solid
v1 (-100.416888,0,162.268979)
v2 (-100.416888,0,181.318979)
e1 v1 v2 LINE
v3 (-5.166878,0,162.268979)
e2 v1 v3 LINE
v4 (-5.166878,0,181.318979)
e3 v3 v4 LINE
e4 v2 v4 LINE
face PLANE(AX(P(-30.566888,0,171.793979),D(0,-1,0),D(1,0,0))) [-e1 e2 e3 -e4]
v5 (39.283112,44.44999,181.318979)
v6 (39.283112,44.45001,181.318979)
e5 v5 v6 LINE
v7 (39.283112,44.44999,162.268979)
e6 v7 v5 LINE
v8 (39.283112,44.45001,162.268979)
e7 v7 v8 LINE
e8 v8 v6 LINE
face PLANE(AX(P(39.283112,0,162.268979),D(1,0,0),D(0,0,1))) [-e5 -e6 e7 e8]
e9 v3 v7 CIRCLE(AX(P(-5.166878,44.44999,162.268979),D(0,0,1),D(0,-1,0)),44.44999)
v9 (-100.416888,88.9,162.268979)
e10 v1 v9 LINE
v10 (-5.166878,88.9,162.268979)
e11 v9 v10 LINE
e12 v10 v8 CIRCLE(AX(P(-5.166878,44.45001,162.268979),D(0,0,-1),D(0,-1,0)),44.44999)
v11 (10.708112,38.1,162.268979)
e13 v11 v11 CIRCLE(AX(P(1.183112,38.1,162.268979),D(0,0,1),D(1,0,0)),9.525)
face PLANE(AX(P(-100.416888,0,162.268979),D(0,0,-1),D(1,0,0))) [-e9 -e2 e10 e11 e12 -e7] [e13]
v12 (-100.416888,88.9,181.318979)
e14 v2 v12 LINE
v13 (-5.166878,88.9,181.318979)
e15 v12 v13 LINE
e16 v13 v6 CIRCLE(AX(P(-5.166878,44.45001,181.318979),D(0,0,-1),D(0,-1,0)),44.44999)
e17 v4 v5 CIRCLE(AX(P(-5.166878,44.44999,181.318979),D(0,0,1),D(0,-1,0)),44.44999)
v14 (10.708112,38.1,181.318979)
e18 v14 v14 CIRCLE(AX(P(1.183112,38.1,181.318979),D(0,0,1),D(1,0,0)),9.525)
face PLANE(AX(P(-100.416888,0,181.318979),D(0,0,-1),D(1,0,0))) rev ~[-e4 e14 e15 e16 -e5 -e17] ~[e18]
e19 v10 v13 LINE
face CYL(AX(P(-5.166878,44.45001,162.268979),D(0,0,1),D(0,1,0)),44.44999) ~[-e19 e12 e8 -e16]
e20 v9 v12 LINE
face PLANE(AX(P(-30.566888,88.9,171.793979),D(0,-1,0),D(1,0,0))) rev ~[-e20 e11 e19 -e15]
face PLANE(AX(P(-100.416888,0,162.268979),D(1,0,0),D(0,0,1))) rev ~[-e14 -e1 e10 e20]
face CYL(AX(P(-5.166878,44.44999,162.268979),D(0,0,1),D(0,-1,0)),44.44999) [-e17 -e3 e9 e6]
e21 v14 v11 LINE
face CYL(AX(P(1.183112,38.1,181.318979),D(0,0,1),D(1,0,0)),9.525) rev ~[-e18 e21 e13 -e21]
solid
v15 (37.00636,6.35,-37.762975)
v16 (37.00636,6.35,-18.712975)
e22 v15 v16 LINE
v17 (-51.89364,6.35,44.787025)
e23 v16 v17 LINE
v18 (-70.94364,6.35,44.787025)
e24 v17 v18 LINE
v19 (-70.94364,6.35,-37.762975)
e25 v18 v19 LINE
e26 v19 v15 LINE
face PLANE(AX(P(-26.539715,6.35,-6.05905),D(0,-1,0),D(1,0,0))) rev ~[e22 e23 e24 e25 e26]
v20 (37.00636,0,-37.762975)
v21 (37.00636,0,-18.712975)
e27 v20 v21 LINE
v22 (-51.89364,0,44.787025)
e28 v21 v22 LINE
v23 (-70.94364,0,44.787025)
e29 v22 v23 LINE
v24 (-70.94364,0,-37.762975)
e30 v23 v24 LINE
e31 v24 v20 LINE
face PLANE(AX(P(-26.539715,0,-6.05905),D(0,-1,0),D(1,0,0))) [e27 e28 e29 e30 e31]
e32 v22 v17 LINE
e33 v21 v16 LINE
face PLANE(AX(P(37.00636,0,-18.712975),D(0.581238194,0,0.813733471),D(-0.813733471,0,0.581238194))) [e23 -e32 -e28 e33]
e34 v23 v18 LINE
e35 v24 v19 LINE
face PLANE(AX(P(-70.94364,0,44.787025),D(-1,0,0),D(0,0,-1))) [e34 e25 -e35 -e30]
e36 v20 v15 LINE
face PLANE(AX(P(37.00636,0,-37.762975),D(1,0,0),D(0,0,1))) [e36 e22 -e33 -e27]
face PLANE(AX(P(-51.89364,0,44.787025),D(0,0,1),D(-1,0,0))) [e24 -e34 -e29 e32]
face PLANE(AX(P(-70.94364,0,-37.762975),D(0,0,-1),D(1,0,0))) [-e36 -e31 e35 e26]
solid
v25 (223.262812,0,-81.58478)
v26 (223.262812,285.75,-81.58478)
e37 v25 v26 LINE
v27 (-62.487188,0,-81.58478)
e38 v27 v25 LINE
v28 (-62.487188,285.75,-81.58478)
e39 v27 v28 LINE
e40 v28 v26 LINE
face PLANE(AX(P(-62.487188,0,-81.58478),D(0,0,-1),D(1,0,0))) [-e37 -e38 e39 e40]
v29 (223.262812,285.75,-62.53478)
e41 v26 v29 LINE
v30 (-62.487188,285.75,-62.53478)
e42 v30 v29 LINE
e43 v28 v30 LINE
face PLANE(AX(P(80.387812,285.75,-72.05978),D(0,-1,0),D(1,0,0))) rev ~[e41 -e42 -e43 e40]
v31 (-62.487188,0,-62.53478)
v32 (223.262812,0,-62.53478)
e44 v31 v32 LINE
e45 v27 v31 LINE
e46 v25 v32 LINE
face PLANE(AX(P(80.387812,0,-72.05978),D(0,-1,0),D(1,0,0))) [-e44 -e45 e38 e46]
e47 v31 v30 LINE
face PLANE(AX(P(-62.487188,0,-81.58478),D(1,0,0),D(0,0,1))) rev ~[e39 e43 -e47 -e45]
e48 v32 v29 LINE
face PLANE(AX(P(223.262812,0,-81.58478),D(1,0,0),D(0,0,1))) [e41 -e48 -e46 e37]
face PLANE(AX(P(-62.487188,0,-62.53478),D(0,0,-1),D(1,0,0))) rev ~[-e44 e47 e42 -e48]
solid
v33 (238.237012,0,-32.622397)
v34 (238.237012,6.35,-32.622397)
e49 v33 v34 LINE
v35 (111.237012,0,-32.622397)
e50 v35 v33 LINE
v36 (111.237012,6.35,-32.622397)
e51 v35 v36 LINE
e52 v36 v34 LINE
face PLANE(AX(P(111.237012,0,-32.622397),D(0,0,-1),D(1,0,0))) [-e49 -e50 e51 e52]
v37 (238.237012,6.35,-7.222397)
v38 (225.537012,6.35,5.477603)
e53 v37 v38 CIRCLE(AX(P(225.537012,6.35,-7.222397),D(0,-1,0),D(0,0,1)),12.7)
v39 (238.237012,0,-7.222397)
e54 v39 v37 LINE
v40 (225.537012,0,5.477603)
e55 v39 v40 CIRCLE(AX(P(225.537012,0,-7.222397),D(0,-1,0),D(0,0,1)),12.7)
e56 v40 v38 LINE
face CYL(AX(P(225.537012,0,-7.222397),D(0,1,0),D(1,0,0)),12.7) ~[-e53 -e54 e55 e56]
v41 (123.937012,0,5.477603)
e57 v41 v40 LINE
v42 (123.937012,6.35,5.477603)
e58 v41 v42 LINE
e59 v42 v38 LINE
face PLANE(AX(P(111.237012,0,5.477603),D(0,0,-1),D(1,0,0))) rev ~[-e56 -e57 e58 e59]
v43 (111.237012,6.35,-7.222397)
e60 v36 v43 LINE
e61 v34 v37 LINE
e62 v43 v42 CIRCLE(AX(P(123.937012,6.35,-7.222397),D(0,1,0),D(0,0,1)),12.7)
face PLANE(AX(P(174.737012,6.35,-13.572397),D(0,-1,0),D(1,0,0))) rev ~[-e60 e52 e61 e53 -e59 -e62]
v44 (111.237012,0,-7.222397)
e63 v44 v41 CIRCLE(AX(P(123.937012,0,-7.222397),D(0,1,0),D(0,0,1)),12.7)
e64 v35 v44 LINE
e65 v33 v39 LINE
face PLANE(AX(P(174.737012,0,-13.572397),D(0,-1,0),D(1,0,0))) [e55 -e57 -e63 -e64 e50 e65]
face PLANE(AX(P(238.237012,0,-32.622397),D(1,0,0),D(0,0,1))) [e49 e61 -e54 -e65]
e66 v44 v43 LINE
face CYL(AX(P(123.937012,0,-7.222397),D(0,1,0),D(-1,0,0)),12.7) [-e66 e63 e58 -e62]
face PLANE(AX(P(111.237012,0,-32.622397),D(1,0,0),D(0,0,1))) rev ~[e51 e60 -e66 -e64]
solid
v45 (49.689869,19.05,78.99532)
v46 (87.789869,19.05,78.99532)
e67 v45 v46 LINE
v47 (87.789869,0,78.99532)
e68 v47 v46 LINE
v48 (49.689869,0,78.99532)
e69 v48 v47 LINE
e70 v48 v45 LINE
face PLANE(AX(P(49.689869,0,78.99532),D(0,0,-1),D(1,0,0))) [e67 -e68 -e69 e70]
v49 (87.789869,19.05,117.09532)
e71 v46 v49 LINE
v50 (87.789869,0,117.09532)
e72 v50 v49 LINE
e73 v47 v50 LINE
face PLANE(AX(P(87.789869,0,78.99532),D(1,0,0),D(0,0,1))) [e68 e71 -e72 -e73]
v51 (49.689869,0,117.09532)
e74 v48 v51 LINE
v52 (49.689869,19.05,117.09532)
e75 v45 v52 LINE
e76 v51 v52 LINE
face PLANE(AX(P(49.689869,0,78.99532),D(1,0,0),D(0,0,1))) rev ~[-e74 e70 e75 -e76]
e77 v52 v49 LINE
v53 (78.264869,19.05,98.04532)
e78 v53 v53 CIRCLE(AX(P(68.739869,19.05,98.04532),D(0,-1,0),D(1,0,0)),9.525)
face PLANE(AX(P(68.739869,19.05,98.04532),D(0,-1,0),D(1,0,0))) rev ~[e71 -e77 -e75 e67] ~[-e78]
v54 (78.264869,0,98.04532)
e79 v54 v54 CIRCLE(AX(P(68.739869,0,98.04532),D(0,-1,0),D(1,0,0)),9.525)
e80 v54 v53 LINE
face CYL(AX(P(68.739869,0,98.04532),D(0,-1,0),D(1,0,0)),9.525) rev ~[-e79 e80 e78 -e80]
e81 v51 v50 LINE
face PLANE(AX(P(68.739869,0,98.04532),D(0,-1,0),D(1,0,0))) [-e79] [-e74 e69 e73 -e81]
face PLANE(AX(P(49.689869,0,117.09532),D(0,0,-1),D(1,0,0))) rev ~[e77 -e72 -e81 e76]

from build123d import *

# Parameters (mm, degrees)
F1_DEPTH  = 6.35
F0_W      = 127
F0_H      = 38.1
F2_R      = 12.7
F3_W      = 285.75
F3_H      = 19.05
F4_DEPTH  = 285.75
F5_W      = 38.1
F5_H      = 38.1
F5_R      = 9.525
F6_DEPTH  = 19.05
F7_W      = 139.7
F7_H      = 19.05
F8_DEPTH  = 88.9
F9_R      = 9.525
F10_DEPTH = 25.4
F11_R     = 44.44999


# Not quite as in the source:
# - a fillet or chamfer is up to 0.001 mm smaller than in the source, because OpenCascade refuses the exact size


with BuildPart() as f1:
    # F0 (on Front) → F1 (new body)
    with BuildSketch(Plane.XZ):
        Polygon((-51.8936398988, 44.7870248234), (-70.9436398988, 44.7870248234), (-70.9436398988, -37.7629751766), (37.0063601012, -37.7629751766), (37.0063601012, -18.7129751766), align=None)
    extrude(amount=-F1_DEPTH)


with BuildPart() as f1b:
    # F0 (on Front) → F1, piece 2 (new body)
    with BuildSketch(Plane.XZ):
        with Locations((174.7370118499, -13.572396946)):
            Rectangle(F0_W, F0_H)
    extrude(amount=-F1_DEPTH)

    # F2
    f2_edges = [f1b.edges().sort_by_distance(p)[0] for p in [
        (238.237012, 3.175, 5.477603),
        (111.237012, 3.175, 5.477603),
    ]]
    fillet(f2_edges, radius=F2_R)


with BuildPart() as f4:
    # F3 (on Front) → F4 (new body)
    with BuildSketch(Plane.XZ):
        with Locations((80.3878121078, -72.0597802344)):
            Rectangle(F3_W, F3_H)
    extrude(amount=-F4_DEPTH)


with BuildPart() as f6:
    # F5 (on Front) → F6 (new body)
    with BuildSketch(Plane.XZ):
        with Locations((68.7398687005, 98.0453198674)):
            Rectangle(F5_W, F5_H)
        with Locations((68.7398687005, 98.0453198674)):
            Circle(F5_R, mode=Mode.SUBTRACT)
    extrude(amount=-F6_DEPTH)


with BuildPart() as f8:
    # F7 (on Front) → F8 (new body)
    with BuildSketch(Plane.XZ):
        with Locations((-30.56688793, 171.7939794795)):
            Rectangle(F7_W, F7_H)
    extrude(amount=-F8_DEPTH)

    # F9 (on face) → F10 (cut)
    with BuildSketch(Plane.XY.offset(181.3189794795)):
        with Locations((1.18311207, 38.1)):
            Circle(F9_R)
    extrude(amount=-F10_DEPTH, mode=Mode.SUBTRACT)

    # F11 (radius 44.45 in the source; OpenCascade refuses exactly that, so slightly less here)
    f11_edges = [f8.edges().sort_by_distance(p)[0] for p in [
        (39.283112, 0, 171.793979),
        (39.283112, 88.9, 171.793979),
    ]]
    fillet(f11_edges, radius=F11_R)


solid = Compound([f1.part, f1b.part, f4.part, f6.part, f8.part])
